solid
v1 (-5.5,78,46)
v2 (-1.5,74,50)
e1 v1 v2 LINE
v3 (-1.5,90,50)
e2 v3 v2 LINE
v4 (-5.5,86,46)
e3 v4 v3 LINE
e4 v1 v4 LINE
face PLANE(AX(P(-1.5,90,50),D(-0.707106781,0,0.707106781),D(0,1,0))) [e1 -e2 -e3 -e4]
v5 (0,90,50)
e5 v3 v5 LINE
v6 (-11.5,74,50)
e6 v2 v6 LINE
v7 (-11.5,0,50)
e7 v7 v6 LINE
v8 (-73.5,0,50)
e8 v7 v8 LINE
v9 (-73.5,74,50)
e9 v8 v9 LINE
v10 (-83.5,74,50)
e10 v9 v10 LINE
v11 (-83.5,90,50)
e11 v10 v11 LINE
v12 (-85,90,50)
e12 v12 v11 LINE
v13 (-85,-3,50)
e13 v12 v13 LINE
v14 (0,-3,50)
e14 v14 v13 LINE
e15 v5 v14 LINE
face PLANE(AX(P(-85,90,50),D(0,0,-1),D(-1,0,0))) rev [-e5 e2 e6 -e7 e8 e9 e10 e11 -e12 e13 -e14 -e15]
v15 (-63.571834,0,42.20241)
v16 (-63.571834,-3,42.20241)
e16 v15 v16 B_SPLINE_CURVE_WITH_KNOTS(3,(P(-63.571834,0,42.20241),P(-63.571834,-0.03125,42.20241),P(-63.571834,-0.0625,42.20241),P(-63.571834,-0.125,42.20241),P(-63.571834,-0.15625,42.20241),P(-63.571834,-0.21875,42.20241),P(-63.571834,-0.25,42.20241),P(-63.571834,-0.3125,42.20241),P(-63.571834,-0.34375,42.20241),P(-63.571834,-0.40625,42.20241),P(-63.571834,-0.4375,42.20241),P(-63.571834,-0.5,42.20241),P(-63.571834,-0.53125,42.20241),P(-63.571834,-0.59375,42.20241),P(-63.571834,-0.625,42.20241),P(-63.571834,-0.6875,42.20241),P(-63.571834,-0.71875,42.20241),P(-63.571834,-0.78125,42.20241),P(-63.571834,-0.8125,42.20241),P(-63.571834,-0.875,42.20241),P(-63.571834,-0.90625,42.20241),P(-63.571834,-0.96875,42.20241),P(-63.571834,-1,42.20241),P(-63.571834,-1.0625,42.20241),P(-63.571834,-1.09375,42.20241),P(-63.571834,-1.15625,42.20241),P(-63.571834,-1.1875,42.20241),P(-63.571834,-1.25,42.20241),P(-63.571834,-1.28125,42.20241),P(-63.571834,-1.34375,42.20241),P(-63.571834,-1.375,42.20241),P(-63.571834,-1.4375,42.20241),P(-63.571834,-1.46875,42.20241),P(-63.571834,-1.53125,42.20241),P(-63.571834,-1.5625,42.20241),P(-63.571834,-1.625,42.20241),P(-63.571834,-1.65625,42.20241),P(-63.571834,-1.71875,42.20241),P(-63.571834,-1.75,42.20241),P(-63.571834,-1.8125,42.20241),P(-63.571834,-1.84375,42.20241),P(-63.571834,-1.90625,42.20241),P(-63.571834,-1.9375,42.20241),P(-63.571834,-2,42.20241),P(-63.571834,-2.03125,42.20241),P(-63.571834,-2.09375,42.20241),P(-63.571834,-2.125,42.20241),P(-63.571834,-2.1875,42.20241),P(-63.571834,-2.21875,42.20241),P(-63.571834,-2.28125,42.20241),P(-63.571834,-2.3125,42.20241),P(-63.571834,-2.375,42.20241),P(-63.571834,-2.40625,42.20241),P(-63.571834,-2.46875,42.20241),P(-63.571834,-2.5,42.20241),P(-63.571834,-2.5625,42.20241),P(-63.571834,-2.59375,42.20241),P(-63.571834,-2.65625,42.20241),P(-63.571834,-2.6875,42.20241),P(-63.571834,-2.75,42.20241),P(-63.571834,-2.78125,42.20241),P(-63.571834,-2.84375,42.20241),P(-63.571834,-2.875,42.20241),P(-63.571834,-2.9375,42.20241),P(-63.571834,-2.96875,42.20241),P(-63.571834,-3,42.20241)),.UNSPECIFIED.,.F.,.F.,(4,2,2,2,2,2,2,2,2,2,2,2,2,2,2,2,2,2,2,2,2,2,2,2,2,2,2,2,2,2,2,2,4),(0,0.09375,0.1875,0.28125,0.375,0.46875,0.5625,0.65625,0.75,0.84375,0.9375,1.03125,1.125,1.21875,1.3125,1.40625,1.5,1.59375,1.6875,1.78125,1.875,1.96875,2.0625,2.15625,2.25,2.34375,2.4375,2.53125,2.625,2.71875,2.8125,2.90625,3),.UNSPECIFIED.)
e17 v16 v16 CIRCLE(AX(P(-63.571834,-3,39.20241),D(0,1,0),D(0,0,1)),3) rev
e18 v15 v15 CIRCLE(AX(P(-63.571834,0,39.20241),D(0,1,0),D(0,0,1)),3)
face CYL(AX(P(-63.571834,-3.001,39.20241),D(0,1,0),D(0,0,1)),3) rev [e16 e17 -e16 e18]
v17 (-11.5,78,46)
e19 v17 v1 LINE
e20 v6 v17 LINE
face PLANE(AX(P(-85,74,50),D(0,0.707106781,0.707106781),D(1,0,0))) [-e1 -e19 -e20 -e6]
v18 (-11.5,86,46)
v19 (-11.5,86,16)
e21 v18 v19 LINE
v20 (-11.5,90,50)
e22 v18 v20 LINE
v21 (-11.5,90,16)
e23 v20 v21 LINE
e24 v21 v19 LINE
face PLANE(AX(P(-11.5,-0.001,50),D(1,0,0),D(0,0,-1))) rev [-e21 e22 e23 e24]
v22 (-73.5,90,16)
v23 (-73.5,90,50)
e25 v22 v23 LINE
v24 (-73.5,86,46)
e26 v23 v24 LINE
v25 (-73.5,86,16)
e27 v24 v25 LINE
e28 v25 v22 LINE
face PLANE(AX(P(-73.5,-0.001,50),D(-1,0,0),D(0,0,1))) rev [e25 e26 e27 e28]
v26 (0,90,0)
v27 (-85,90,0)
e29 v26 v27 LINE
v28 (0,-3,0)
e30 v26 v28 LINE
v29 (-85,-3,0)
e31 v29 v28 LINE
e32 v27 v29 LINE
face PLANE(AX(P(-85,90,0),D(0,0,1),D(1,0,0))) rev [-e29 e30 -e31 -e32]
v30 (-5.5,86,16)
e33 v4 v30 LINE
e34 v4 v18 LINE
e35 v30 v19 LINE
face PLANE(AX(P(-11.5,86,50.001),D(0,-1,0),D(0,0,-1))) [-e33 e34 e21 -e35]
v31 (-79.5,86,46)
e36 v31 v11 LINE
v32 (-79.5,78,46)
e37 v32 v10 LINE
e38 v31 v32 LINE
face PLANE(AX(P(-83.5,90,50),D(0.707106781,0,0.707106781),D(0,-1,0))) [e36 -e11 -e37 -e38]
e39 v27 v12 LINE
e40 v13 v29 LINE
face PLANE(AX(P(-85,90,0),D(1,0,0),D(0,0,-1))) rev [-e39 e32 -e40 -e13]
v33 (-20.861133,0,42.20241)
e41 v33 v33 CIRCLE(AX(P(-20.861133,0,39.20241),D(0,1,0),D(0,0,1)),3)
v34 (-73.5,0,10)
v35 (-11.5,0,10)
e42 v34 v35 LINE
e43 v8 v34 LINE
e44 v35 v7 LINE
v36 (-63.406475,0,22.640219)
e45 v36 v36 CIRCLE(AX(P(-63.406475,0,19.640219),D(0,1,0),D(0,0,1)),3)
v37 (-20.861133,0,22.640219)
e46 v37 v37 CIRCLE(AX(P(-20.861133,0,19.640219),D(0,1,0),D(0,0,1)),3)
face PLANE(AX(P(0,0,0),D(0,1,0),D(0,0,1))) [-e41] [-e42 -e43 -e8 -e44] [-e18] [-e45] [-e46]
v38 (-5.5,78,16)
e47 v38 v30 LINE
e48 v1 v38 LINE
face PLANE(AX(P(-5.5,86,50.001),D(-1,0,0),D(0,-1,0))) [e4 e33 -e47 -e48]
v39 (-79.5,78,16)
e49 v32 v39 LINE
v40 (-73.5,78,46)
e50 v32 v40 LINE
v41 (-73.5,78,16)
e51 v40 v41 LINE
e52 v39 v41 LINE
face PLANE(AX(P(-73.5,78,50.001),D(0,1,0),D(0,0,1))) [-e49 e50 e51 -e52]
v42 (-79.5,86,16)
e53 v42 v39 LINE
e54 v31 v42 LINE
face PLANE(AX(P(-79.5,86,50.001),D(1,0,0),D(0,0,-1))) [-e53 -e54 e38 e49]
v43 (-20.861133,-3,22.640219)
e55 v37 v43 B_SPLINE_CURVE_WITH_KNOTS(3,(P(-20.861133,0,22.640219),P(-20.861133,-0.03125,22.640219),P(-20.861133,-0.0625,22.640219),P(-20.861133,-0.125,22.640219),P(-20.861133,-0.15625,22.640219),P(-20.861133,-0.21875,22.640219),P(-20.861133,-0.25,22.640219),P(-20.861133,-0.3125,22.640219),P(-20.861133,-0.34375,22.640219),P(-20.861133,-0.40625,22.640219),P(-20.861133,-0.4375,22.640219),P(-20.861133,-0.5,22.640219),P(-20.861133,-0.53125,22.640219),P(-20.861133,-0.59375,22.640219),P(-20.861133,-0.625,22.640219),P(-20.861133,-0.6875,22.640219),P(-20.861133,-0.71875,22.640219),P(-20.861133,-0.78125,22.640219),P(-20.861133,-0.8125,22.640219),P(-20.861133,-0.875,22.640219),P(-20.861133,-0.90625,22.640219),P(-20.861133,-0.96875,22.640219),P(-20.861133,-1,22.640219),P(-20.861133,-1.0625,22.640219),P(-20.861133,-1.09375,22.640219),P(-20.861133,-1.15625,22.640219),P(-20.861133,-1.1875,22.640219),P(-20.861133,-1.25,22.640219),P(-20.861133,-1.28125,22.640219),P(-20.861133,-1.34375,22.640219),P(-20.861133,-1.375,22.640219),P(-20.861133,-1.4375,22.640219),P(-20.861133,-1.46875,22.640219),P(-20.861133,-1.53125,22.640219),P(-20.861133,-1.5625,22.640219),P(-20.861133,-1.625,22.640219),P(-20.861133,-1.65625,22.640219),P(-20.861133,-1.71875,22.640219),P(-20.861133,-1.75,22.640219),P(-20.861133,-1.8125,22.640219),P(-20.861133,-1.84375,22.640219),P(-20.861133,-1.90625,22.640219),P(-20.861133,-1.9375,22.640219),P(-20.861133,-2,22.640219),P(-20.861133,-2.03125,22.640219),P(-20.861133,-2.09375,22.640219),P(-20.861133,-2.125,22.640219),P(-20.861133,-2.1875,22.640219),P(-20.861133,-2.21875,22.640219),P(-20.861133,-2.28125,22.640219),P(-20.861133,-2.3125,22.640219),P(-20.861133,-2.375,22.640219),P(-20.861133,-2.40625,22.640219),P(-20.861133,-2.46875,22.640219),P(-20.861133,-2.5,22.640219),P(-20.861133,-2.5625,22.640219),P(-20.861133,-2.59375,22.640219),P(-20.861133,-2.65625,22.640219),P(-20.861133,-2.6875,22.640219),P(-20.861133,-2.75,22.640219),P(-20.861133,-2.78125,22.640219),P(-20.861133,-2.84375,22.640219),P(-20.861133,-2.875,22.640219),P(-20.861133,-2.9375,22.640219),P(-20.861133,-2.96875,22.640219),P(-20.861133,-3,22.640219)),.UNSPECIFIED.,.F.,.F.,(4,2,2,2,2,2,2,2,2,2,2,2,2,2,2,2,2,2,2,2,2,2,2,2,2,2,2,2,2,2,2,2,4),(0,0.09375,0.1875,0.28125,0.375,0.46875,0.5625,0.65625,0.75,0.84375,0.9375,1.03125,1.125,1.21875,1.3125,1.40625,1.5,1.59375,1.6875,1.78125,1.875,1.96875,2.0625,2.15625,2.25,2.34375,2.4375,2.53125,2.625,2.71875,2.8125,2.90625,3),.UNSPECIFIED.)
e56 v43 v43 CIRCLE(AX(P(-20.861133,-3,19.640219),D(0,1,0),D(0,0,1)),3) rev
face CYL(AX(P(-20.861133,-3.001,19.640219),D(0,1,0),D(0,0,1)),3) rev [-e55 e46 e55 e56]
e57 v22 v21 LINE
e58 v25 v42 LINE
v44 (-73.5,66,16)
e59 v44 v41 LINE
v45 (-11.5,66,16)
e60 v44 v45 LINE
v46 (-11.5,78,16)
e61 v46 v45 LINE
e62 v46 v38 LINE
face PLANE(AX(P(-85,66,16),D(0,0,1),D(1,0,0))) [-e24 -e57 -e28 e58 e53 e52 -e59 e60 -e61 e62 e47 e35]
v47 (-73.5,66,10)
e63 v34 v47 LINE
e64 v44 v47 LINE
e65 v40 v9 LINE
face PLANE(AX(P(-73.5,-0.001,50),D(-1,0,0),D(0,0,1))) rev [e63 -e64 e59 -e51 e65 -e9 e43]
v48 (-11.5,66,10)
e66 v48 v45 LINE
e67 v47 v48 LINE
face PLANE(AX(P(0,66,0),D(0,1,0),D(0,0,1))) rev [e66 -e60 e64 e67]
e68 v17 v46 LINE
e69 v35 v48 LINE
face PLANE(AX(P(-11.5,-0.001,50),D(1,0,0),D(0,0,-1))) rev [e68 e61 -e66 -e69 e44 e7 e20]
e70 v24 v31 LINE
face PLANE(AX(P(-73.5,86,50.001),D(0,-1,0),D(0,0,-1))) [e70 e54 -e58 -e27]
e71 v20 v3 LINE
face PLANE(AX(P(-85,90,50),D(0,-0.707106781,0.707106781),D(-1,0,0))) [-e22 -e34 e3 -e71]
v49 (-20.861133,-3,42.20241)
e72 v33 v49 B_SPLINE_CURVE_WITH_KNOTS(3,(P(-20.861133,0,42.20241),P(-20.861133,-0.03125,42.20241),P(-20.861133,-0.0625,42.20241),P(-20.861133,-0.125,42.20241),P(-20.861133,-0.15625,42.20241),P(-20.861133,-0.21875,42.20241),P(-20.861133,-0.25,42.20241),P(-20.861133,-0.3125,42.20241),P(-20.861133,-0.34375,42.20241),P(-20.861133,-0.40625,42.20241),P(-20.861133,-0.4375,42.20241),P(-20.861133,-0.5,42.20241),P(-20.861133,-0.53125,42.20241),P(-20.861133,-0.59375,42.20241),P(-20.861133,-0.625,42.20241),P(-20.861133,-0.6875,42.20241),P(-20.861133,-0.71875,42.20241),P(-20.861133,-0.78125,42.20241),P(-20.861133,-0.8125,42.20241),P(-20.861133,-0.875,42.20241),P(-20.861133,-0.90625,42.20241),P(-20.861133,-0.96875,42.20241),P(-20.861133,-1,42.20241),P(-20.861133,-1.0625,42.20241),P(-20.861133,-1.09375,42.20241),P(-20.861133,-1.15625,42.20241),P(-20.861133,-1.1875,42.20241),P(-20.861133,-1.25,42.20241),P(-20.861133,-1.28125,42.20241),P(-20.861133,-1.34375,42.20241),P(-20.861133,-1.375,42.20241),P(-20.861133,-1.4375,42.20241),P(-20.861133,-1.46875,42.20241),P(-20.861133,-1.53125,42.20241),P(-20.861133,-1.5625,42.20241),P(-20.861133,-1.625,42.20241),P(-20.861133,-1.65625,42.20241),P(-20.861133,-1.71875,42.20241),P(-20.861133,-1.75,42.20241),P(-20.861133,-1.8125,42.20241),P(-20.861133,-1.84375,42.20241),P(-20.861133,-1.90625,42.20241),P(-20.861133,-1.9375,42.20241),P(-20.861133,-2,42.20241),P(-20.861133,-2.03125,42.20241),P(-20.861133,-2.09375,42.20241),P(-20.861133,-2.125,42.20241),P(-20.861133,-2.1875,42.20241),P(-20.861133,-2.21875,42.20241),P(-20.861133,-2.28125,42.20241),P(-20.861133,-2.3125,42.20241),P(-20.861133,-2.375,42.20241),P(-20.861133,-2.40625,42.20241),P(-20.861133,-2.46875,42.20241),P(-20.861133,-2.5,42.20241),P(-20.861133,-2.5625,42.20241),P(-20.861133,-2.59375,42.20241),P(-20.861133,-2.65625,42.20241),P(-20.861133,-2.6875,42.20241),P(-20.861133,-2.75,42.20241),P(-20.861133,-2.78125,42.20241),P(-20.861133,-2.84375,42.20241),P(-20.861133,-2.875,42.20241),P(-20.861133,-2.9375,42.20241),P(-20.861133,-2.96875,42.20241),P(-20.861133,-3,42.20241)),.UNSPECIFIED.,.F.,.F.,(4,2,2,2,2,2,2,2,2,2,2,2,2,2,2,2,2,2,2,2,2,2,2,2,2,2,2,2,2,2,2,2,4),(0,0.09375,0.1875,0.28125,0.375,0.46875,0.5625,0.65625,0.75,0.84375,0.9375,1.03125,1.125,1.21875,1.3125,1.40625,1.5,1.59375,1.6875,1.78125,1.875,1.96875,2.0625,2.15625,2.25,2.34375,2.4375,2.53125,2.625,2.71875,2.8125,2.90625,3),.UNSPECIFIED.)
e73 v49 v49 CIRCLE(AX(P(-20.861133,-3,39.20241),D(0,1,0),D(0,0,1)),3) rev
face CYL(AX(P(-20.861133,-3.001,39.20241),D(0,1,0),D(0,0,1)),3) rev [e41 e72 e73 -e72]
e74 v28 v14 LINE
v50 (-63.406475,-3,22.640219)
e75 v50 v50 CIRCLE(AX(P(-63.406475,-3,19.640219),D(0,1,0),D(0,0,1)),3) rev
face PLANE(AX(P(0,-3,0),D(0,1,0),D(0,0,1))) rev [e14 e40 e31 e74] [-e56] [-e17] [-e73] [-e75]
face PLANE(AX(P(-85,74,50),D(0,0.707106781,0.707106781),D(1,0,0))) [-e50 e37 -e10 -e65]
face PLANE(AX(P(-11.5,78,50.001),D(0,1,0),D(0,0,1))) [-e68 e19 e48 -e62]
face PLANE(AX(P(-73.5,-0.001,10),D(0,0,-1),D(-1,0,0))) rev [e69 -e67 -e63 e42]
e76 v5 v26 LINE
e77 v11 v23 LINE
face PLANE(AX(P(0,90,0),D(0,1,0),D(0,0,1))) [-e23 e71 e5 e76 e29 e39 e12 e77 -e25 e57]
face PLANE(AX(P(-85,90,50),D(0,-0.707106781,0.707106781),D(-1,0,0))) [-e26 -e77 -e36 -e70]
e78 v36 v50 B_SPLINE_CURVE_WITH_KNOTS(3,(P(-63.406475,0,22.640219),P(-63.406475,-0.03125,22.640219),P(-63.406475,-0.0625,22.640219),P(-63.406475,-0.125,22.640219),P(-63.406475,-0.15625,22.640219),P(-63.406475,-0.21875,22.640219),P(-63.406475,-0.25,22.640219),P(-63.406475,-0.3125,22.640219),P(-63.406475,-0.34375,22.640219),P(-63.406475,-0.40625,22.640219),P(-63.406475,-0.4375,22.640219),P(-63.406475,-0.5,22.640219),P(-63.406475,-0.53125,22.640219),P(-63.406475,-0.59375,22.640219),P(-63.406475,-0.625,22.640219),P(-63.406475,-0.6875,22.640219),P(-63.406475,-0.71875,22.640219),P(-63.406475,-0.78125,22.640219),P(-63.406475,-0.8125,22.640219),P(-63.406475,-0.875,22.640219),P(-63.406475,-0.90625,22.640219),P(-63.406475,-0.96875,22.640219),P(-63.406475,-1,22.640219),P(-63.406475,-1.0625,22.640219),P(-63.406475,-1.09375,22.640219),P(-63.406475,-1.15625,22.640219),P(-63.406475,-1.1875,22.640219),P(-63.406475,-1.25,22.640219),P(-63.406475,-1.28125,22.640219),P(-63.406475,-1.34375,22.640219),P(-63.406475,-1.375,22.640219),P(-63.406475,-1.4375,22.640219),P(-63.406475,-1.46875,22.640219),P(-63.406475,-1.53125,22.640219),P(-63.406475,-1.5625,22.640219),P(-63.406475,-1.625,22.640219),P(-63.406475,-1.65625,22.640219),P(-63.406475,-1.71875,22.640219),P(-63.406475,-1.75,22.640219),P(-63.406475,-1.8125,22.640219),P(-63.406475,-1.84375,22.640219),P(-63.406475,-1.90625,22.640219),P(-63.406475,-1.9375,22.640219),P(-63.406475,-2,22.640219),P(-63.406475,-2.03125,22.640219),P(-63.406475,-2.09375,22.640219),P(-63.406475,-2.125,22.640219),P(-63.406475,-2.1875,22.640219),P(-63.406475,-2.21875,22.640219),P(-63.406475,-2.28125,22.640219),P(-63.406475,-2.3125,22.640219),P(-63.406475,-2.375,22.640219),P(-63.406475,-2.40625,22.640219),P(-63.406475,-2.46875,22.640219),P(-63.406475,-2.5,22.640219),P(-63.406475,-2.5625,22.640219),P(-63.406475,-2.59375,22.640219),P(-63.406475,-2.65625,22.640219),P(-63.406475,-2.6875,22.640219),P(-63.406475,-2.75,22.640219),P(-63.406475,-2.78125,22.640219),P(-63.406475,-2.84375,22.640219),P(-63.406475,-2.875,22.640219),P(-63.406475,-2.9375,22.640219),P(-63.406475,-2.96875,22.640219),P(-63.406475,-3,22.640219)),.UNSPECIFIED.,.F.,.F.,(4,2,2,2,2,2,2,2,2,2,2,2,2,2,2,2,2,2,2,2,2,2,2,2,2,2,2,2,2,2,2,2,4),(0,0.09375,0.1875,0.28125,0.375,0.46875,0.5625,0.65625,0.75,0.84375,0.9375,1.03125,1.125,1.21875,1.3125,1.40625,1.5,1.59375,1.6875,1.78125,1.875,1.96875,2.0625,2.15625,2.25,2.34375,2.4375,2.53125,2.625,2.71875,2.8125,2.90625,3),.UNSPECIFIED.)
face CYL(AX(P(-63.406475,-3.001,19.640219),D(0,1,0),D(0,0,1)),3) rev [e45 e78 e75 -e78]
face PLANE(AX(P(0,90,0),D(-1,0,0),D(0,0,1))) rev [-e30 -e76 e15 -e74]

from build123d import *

# Parameters (mm, degrees)
SKETCH1_W           = 85
SKETCH1_H           = 50
BOSS_EXTRUDE1_DEPTH = 90
CUT_EXTRUDE1_REACH  = 135.51
SKETCH2_W           = 62
SKETCH2_H           = 40
SKETCH3_W           = 85
SKETCH3_H           = 16
BOSS_EXTRUDE2_DEPTH = 24
CUT_EXTRUDE2_REACH  = 130.378
SKETCH4_W           = 6
SKETCH4_H           = 8
SKETCH5_W           = 85
SKETCH5_H           = 50
BOSS_EXTRUDE3_DEPTH = 3
CUT_EXTRUDE3_REACH  = 135.51
SKETCH6_R           = 3
CHAMFER1_SIZE       = 4


with BuildPart() as part:
    # Sketch1 → Boss-Extrude1 (new body)
    with BuildSketch(Plane(origin=(0, 0, 0), x_dir=(1, 0, 0), z_dir=(0, 1, 0))):
        with Locations((-42.5, -25)):
            Rectangle(SKETCH1_W, SKETCH1_H)
    extrude(amount=BOSS_EXTRUDE1_DEPTH)

    # Sketch2 → Cut-Extrude1 (cut, up to next)
    with BuildSketch(Plane(origin=(0, 90, 0), x_dir=(1, 0, 0), z_dir=(0, 1, 0)), mode=Mode.PRIVATE) as cut_extrude1_sk1:
        with Locations((-42.5, -30)):
            Rectangle(SKETCH2_W, SKETCH2_H)
    cut_extrude1_tool1 = extrude(cut_extrude1_sk1.sketch, amount=-CUT_EXTRUDE1_REACH, mode=Mode.PRIVATE) & part.part
    add(cut_extrude1_tool1.solids().sort_by_distance((-42.5, 90, 30))[0], mode=Mode.SUBTRACT)

    # Sketch3 → Boss-Extrude2 (add)
    with BuildSketch(Plane(origin=(0, 90, 0), x_dir=(1, 0, 0), z_dir=(0, 1, 0))):
        with Locations((-42.5, -8)):
            Rectangle(SKETCH3_W, SKETCH3_H)
    extrude(amount=-BOSS_EXTRUDE2_DEPTH)

    # Sketch4 → Cut-Extrude2 (cut, up to next)
    with BuildSketch(Plane.XY.offset(16), mode=Mode.PRIVATE) as cut_extrude2_sk1:
        with Locations((-76.5, 82)):
            Rectangle(SKETCH4_W, SKETCH4_H)
    cut_extrude2_tool1 = extrude(cut_extrude2_sk1.sketch, amount=CUT_EXTRUDE2_REACH, mode=Mode.PRIVATE) & part.part
    # Sketch4 → Cut-Extrude2 (cut, up to next)
    with BuildSketch(Plane.XY.offset(16), mode=Mode.PRIVATE) as cut_extrude2_sk2:
        with Locations((-8.5, 82)):
            Rectangle(SKETCH4_W, SKETCH4_H)
    cut_extrude2_tool2 = extrude(cut_extrude2_sk2.sketch, amount=CUT_EXTRUDE2_REACH, mode=Mode.PRIVATE) & part.part
    add(cut_extrude2_tool1.solids().sort_by_distance((-76.5, 82, 16))[0], mode=Mode.SUBTRACT)
    add(cut_extrude2_tool2.solids().sort_by_distance((-8.5, 82, 16))[0], mode=Mode.SUBTRACT)

    # Sketch5 → Boss-Extrude3 (add)
    with BuildSketch(Plane.XZ):
        with Locations((-42.5, 25)):
            Rectangle(SKETCH5_W, SKETCH5_H)
    extrude(amount=BOSS_EXTRUDE3_DEPTH)

    # Sketch6 → Cut-Extrude3 (cut, up to next)
    with BuildSketch(Plane(origin=(0, 0, 0), x_dir=(1, 0, 0), z_dir=(0, 1, 0)), mode=Mode.PRIVATE) as cut_extrude3_sk1:
        with Locations(Location((-63.406474548, -19.640219105, 0), (0, 0, 270))):
            Circle(SKETCH6_R)
    cut_extrude3_tool1 = extrude(cut_extrude3_sk1.sketch, amount=-CUT_EXTRUDE3_REACH, mode=Mode.PRIVATE) & part.part
    # Sketch6 → Cut-Extrude3 (cut, up to next)
    with BuildSketch(Plane(origin=(0, 0, 0), x_dir=(1, 0, 0), z_dir=(0, 1, 0)), mode=Mode.PRIVATE) as cut_extrude3_sk2:
        with Locations(Location((-20.861133032, -19.640219105, 0), (0, 0, 270))):
            Circle(SKETCH6_R)
    cut_extrude3_tool2 = extrude(cut_extrude3_sk2.sketch, amount=-CUT_EXTRUDE3_REACH, mode=Mode.PRIVATE) & part.part
    # Sketch6 → Cut-Extrude3 (cut, up to next)
    with BuildSketch(Plane(origin=(0, 0, 0), x_dir=(1, 0, 0), z_dir=(0, 1, 0)), mode=Mode.PRIVATE) as cut_extrude3_sk3:
        with Locations(Location((-20.861133032, -39.202410137, 0), (0, 0, 270))):
            Circle(SKETCH6_R)
    cut_extrude3_tool3 = extrude(cut_extrude3_sk3.sketch, amount=-CUT_EXTRUDE3_REACH, mode=Mode.PRIVATE) & part.part
    # Sketch6 → Cut-Extrude3 (cut, up to next)
    with BuildSketch(Plane(origin=(0, 0, 0), x_dir=(1, 0, 0), z_dir=(0, 1, 0)), mode=Mode.PRIVATE) as cut_extrude3_sk4:
        with Locations(Location((-63.571834409, -39.202410137, 0), (0, 0, 270))):
            Circle(SKETCH6_R)
    cut_extrude3_tool4 = extrude(cut_extrude3_sk4.sketch, amount=-CUT_EXTRUDE3_REACH, mode=Mode.PRIVATE) & part.part
    add(cut_extrude3_tool1.solids().sort_by_distance((-63.406475, 0, 19.640219))[0], mode=Mode.SUBTRACT)
    add(cut_extrude3_tool2.solids().sort_by_distance((-20.861133, 0, 19.640219))[0], mode=Mode.SUBTRACT)
    add(cut_extrude3_tool3.solids().sort_by_distance((-20.861133, 0, 39.20241))[0], mode=Mode.SUBTRACT)
    add(cut_extrude3_tool4.solids().sort_by_distance((-63.571834, 0, 39.20241))[0], mode=Mode.SUBTRACT)

    # Chamfer1
    chamfer1_edges = [part.edges().sort_by_distance(p)[0] for p in [
        (-76.5, 86, 50),
        (-79.5, 82, 50),
        (-76.5, 78, 50),
        (-8.5, 78, 50),
        (-5.5, 82, 50),
        (-8.5, 86, 50),
    ]]
    chamfer(chamfer1_edges, length=CHAMFER1_SIZE - 0.0001)  # a hair under: the kernel refuses the full size


solid = part.part
